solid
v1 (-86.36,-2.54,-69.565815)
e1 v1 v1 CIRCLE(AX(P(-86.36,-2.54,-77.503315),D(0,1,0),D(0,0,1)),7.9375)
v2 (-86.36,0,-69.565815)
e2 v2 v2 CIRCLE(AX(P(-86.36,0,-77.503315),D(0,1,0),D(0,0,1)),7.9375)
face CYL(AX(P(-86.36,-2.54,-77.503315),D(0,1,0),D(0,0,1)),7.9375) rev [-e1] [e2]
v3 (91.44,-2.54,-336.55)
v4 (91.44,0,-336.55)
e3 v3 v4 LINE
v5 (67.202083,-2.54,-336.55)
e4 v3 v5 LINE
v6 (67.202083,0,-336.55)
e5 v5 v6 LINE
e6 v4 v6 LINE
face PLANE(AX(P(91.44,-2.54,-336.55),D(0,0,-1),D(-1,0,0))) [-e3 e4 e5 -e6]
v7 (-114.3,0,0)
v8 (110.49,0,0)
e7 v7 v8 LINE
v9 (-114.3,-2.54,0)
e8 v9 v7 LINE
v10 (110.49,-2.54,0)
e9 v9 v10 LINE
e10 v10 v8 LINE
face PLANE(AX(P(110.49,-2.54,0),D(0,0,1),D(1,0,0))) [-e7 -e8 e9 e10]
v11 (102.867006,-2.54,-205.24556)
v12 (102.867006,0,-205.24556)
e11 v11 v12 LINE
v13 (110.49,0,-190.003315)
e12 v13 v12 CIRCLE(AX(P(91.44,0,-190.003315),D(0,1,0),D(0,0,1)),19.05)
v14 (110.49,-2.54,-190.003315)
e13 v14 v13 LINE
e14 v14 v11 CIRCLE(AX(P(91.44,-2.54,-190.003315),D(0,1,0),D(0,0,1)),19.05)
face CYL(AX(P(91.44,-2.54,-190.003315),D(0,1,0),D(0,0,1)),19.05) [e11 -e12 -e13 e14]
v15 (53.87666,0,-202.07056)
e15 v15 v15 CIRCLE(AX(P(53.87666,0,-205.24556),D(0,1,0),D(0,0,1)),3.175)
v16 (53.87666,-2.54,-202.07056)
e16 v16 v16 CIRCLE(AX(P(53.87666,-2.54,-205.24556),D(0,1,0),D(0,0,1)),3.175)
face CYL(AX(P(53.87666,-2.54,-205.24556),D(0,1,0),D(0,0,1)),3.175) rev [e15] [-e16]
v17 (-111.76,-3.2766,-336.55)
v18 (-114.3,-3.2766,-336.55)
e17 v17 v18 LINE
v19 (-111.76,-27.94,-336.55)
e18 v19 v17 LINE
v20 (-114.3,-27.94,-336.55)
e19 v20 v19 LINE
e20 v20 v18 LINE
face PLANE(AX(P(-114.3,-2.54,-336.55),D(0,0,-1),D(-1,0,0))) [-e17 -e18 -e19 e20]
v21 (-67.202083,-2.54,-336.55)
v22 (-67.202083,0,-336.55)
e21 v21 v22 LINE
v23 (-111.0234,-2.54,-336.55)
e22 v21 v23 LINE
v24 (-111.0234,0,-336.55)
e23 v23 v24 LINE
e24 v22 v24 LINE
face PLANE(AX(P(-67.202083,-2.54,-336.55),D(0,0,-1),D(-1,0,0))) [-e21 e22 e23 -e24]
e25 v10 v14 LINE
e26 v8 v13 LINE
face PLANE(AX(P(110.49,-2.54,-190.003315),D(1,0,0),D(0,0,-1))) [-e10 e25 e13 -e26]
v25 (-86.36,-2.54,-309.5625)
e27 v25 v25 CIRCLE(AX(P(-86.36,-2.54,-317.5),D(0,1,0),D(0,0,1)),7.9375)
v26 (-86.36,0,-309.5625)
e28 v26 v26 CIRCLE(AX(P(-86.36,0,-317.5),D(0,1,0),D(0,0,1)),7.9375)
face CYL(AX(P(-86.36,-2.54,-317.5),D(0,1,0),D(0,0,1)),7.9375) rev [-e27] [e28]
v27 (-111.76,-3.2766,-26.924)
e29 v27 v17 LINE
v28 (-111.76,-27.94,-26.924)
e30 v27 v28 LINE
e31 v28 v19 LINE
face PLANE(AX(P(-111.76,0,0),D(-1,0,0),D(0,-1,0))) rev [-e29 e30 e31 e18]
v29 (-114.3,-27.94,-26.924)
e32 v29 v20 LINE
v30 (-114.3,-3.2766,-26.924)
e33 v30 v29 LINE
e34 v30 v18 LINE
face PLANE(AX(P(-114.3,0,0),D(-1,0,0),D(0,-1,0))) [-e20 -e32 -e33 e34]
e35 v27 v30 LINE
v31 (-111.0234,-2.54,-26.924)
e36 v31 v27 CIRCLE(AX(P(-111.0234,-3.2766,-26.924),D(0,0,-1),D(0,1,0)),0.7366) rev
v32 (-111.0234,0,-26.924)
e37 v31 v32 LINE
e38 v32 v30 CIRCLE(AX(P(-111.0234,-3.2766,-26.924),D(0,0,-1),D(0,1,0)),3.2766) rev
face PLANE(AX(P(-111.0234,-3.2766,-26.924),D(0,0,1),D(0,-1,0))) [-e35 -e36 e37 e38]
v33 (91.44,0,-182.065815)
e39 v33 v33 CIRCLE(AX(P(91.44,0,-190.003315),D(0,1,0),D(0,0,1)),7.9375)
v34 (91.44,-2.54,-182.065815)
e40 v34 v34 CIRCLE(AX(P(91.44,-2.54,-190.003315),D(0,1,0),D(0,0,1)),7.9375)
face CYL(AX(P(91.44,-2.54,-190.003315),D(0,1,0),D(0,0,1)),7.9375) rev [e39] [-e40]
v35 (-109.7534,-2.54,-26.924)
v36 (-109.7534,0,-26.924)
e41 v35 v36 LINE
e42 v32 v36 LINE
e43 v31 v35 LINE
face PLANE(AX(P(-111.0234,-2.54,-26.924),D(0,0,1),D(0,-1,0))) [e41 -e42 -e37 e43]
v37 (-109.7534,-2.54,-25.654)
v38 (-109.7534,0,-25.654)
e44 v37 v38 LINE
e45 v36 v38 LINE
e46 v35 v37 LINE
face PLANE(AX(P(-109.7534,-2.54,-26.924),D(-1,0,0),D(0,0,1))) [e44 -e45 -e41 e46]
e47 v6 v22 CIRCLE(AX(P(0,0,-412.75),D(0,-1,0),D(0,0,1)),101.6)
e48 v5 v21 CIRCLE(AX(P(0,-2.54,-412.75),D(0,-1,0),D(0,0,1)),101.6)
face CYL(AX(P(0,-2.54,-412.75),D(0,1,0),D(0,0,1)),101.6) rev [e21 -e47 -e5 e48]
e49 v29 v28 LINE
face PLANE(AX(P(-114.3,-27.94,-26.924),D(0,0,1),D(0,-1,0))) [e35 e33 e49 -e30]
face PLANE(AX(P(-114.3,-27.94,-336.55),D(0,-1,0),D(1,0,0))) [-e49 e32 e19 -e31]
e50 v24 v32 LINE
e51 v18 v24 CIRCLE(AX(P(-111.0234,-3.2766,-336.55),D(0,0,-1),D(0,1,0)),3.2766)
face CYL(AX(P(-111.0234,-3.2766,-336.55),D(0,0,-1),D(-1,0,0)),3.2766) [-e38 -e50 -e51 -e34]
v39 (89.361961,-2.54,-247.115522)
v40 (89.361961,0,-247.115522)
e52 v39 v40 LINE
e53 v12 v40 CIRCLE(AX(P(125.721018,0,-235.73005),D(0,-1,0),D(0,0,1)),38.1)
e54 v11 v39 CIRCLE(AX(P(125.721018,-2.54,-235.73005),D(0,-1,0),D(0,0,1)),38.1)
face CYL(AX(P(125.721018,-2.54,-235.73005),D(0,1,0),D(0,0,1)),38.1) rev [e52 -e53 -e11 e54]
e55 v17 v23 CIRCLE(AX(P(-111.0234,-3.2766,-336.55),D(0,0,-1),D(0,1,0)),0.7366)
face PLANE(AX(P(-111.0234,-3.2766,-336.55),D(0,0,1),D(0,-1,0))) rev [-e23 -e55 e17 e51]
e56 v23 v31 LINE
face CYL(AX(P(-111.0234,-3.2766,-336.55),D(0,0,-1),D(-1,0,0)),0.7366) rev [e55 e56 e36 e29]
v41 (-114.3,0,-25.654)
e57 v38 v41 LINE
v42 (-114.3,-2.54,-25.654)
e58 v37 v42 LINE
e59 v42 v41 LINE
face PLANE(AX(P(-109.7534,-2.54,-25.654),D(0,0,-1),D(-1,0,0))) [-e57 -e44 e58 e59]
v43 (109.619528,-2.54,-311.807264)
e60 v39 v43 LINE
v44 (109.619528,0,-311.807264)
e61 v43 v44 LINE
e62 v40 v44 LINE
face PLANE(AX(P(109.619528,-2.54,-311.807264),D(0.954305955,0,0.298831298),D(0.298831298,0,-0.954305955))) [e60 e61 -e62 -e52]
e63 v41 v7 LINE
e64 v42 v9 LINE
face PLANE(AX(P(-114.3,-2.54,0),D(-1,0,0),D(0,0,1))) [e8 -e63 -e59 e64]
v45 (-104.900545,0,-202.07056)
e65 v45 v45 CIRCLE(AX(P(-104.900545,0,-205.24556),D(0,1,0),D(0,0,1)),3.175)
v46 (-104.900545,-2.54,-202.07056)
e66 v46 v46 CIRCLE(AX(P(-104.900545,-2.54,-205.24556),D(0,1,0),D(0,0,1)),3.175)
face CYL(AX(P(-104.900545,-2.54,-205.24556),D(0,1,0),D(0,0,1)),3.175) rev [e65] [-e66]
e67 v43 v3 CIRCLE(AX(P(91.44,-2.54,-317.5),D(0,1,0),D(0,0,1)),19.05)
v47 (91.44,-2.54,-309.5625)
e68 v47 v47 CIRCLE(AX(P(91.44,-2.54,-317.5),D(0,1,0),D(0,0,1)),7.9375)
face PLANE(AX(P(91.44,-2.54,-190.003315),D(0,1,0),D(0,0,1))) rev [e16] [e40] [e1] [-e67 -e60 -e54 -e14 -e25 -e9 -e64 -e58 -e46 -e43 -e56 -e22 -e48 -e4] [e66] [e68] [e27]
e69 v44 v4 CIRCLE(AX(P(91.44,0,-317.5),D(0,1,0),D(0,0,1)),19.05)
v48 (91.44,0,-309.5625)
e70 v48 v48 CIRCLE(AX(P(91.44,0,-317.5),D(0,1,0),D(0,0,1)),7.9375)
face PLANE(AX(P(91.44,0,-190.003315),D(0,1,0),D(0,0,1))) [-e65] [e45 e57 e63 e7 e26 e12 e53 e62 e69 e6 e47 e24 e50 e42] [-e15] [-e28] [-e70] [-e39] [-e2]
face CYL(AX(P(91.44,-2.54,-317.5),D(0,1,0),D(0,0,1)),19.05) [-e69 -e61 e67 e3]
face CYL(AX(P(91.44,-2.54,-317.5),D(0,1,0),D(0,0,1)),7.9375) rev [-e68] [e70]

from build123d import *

# Parameters (mm, degrees)
SKETCH1_R                     = 7.9375
SKETCH1_R_2                   = 3.175
BASE_FLANGE1_DEPTH            = 2.54
EDGE_FLANGE2_STRIP_W          = 11.6332
EDGE_FLANGE2_STRIP_H          = 2.54
EDGE_FLANGE2_STRIP_CUT_DEPTH  = 309.626
EDGE_FLANGE2_RELIEF_W         = 12.9032
EDGE_FLANGE2_RELIEF_H         = 1.27
EDGE_FLANGE2_RELIEF_CUT_DEPTH = 2.54
EDGE_FLANGE2_DEPTH            = 309.626


# Sheet-metal steps are written as plain solids
with BuildPart() as part:
    # Sketch1 → Base-Flange1 (new body)
    with BuildSketch(Plane(origin=(0, 0, 0), x_dir=(1, 0, 0), z_dir=(0, 1, 0))):
        with BuildLine():
            Line((109.619528436, 311.807263764), (89.361961148, 247.115522342))
            ThreePointArc((89.361961148, 247.115522342), (89.460566801, 224.034337943), (102.867006006, 205.245559798))
            ThreePointArc((102.867006006, 205.245559798), (108.478001121, 198.524407286), (110.49, 190.003314763))
            Line((110.49, 190.003314763), (110.49, 0))
            Line((110.49, 0), (-114.3, 0))
            Line((-114.3, 0), (-114.3, 336.55))
            Line((-114.3, 336.55), (-67.202083301, 336.55))
            ThreePointArc((-67.202083301, 336.55), (0, 311.15), (67.202083301, 336.55))
            Line((67.202083301, 336.55), (91.44, 336.55))
            ThreePointArc((91.44, 336.55), (106.791695758, 328.779536221), (109.619528436, 311.807263764))
        make_face()
        with Locations(Location((-86.36, 317.5, 0), (0, 0, 270))):
            Circle(SKETCH1_R, mode=Mode.SUBTRACT)
        with Locations(Location((91.44, 317.5, 0), (0, 0, 270))):
            Circle(SKETCH1_R, mode=Mode.SUBTRACT)
        with Locations(Location((91.44, 190.003314763, 0), (0, 0, 270))):
            Circle(SKETCH1_R, mode=Mode.SUBTRACT)
        with Locations(Location((-86.36, 77.503314763, 0), (0, 0, 270))):
            Circle(SKETCH1_R, mode=Mode.SUBTRACT)
        with Locations(Location((-104.900544931, 205.245559798, 0), (0, 0, 270))):
            Circle(SKETCH1_R_2, mode=Mode.SUBTRACT)
        with Locations(Location((53.876660191, 205.245559798, 0), (0, 0, 270))):
            Circle(SKETCH1_R_2, mode=Mode.SUBTRACT)
    extrude(amount=-BASE_FLANGE1_DEPTH)

    # Edge-Flange2 strip (across the edge) → Edge-Flange2 strip cut (cut)
    with BuildSketch(Plane(origin=(-114.3, -2.54, -26.924), x_dir=(1, 0, 0), z_dir=(0, 0, -1))):
        with Locations((-2.54, -1.27)):
            Rectangle(EDGE_FLANGE2_STRIP_W, EDGE_FLANGE2_STRIP_H)
    extrude(amount=EDGE_FLANGE2_STRIP_CUT_DEPTH, mode=Mode.SUBTRACT)

    # Edge-Flange2 relief (on the sheet) → Edge-Flange2 relief cut (cut)
    with BuildSketch(Plane(origin=(-111.0234, -2.54, -26.924), x_dir=(1, 0, 0), z_dir=(0, -1, 0))):
        with Locations((-5.1816, 0.635)):
            Rectangle(EDGE_FLANGE2_RELIEF_W, EDGE_FLANGE2_RELIEF_H)
    extrude(amount=-EDGE_FLANGE2_RELIEF_CUT_DEPTH, mode=Mode.SUBTRACT)

    # Edge-Flange2 section (across the edge) → Edge-Flange2 (add)
    with BuildSketch(Plane(origin=(-114.3, -2.54, -26.924), x_dir=(1, 0, 0), z_dir=(0, 0, -1))):
        with BuildLine():
            Line((0, 0.7366), (0, 25.4))
            Line((0, 25.4), (2.54, 25.4))
            Line((2.54, 25.4), (2.54, 0.7366))
            ThreePointArc((2.54, 0.7366), (2.755745145, 0.215745145), (3.2766, 0))
            Line((3.2766, 0), (3.2766, -2.54))
            ThreePointArc((3.2766, -2.54), (0.959693921, -1.580306079), (0, 0.7366))
        make_face()
    extrude(amount=EDGE_FLANGE2_DEPTH)


solid = part.part
